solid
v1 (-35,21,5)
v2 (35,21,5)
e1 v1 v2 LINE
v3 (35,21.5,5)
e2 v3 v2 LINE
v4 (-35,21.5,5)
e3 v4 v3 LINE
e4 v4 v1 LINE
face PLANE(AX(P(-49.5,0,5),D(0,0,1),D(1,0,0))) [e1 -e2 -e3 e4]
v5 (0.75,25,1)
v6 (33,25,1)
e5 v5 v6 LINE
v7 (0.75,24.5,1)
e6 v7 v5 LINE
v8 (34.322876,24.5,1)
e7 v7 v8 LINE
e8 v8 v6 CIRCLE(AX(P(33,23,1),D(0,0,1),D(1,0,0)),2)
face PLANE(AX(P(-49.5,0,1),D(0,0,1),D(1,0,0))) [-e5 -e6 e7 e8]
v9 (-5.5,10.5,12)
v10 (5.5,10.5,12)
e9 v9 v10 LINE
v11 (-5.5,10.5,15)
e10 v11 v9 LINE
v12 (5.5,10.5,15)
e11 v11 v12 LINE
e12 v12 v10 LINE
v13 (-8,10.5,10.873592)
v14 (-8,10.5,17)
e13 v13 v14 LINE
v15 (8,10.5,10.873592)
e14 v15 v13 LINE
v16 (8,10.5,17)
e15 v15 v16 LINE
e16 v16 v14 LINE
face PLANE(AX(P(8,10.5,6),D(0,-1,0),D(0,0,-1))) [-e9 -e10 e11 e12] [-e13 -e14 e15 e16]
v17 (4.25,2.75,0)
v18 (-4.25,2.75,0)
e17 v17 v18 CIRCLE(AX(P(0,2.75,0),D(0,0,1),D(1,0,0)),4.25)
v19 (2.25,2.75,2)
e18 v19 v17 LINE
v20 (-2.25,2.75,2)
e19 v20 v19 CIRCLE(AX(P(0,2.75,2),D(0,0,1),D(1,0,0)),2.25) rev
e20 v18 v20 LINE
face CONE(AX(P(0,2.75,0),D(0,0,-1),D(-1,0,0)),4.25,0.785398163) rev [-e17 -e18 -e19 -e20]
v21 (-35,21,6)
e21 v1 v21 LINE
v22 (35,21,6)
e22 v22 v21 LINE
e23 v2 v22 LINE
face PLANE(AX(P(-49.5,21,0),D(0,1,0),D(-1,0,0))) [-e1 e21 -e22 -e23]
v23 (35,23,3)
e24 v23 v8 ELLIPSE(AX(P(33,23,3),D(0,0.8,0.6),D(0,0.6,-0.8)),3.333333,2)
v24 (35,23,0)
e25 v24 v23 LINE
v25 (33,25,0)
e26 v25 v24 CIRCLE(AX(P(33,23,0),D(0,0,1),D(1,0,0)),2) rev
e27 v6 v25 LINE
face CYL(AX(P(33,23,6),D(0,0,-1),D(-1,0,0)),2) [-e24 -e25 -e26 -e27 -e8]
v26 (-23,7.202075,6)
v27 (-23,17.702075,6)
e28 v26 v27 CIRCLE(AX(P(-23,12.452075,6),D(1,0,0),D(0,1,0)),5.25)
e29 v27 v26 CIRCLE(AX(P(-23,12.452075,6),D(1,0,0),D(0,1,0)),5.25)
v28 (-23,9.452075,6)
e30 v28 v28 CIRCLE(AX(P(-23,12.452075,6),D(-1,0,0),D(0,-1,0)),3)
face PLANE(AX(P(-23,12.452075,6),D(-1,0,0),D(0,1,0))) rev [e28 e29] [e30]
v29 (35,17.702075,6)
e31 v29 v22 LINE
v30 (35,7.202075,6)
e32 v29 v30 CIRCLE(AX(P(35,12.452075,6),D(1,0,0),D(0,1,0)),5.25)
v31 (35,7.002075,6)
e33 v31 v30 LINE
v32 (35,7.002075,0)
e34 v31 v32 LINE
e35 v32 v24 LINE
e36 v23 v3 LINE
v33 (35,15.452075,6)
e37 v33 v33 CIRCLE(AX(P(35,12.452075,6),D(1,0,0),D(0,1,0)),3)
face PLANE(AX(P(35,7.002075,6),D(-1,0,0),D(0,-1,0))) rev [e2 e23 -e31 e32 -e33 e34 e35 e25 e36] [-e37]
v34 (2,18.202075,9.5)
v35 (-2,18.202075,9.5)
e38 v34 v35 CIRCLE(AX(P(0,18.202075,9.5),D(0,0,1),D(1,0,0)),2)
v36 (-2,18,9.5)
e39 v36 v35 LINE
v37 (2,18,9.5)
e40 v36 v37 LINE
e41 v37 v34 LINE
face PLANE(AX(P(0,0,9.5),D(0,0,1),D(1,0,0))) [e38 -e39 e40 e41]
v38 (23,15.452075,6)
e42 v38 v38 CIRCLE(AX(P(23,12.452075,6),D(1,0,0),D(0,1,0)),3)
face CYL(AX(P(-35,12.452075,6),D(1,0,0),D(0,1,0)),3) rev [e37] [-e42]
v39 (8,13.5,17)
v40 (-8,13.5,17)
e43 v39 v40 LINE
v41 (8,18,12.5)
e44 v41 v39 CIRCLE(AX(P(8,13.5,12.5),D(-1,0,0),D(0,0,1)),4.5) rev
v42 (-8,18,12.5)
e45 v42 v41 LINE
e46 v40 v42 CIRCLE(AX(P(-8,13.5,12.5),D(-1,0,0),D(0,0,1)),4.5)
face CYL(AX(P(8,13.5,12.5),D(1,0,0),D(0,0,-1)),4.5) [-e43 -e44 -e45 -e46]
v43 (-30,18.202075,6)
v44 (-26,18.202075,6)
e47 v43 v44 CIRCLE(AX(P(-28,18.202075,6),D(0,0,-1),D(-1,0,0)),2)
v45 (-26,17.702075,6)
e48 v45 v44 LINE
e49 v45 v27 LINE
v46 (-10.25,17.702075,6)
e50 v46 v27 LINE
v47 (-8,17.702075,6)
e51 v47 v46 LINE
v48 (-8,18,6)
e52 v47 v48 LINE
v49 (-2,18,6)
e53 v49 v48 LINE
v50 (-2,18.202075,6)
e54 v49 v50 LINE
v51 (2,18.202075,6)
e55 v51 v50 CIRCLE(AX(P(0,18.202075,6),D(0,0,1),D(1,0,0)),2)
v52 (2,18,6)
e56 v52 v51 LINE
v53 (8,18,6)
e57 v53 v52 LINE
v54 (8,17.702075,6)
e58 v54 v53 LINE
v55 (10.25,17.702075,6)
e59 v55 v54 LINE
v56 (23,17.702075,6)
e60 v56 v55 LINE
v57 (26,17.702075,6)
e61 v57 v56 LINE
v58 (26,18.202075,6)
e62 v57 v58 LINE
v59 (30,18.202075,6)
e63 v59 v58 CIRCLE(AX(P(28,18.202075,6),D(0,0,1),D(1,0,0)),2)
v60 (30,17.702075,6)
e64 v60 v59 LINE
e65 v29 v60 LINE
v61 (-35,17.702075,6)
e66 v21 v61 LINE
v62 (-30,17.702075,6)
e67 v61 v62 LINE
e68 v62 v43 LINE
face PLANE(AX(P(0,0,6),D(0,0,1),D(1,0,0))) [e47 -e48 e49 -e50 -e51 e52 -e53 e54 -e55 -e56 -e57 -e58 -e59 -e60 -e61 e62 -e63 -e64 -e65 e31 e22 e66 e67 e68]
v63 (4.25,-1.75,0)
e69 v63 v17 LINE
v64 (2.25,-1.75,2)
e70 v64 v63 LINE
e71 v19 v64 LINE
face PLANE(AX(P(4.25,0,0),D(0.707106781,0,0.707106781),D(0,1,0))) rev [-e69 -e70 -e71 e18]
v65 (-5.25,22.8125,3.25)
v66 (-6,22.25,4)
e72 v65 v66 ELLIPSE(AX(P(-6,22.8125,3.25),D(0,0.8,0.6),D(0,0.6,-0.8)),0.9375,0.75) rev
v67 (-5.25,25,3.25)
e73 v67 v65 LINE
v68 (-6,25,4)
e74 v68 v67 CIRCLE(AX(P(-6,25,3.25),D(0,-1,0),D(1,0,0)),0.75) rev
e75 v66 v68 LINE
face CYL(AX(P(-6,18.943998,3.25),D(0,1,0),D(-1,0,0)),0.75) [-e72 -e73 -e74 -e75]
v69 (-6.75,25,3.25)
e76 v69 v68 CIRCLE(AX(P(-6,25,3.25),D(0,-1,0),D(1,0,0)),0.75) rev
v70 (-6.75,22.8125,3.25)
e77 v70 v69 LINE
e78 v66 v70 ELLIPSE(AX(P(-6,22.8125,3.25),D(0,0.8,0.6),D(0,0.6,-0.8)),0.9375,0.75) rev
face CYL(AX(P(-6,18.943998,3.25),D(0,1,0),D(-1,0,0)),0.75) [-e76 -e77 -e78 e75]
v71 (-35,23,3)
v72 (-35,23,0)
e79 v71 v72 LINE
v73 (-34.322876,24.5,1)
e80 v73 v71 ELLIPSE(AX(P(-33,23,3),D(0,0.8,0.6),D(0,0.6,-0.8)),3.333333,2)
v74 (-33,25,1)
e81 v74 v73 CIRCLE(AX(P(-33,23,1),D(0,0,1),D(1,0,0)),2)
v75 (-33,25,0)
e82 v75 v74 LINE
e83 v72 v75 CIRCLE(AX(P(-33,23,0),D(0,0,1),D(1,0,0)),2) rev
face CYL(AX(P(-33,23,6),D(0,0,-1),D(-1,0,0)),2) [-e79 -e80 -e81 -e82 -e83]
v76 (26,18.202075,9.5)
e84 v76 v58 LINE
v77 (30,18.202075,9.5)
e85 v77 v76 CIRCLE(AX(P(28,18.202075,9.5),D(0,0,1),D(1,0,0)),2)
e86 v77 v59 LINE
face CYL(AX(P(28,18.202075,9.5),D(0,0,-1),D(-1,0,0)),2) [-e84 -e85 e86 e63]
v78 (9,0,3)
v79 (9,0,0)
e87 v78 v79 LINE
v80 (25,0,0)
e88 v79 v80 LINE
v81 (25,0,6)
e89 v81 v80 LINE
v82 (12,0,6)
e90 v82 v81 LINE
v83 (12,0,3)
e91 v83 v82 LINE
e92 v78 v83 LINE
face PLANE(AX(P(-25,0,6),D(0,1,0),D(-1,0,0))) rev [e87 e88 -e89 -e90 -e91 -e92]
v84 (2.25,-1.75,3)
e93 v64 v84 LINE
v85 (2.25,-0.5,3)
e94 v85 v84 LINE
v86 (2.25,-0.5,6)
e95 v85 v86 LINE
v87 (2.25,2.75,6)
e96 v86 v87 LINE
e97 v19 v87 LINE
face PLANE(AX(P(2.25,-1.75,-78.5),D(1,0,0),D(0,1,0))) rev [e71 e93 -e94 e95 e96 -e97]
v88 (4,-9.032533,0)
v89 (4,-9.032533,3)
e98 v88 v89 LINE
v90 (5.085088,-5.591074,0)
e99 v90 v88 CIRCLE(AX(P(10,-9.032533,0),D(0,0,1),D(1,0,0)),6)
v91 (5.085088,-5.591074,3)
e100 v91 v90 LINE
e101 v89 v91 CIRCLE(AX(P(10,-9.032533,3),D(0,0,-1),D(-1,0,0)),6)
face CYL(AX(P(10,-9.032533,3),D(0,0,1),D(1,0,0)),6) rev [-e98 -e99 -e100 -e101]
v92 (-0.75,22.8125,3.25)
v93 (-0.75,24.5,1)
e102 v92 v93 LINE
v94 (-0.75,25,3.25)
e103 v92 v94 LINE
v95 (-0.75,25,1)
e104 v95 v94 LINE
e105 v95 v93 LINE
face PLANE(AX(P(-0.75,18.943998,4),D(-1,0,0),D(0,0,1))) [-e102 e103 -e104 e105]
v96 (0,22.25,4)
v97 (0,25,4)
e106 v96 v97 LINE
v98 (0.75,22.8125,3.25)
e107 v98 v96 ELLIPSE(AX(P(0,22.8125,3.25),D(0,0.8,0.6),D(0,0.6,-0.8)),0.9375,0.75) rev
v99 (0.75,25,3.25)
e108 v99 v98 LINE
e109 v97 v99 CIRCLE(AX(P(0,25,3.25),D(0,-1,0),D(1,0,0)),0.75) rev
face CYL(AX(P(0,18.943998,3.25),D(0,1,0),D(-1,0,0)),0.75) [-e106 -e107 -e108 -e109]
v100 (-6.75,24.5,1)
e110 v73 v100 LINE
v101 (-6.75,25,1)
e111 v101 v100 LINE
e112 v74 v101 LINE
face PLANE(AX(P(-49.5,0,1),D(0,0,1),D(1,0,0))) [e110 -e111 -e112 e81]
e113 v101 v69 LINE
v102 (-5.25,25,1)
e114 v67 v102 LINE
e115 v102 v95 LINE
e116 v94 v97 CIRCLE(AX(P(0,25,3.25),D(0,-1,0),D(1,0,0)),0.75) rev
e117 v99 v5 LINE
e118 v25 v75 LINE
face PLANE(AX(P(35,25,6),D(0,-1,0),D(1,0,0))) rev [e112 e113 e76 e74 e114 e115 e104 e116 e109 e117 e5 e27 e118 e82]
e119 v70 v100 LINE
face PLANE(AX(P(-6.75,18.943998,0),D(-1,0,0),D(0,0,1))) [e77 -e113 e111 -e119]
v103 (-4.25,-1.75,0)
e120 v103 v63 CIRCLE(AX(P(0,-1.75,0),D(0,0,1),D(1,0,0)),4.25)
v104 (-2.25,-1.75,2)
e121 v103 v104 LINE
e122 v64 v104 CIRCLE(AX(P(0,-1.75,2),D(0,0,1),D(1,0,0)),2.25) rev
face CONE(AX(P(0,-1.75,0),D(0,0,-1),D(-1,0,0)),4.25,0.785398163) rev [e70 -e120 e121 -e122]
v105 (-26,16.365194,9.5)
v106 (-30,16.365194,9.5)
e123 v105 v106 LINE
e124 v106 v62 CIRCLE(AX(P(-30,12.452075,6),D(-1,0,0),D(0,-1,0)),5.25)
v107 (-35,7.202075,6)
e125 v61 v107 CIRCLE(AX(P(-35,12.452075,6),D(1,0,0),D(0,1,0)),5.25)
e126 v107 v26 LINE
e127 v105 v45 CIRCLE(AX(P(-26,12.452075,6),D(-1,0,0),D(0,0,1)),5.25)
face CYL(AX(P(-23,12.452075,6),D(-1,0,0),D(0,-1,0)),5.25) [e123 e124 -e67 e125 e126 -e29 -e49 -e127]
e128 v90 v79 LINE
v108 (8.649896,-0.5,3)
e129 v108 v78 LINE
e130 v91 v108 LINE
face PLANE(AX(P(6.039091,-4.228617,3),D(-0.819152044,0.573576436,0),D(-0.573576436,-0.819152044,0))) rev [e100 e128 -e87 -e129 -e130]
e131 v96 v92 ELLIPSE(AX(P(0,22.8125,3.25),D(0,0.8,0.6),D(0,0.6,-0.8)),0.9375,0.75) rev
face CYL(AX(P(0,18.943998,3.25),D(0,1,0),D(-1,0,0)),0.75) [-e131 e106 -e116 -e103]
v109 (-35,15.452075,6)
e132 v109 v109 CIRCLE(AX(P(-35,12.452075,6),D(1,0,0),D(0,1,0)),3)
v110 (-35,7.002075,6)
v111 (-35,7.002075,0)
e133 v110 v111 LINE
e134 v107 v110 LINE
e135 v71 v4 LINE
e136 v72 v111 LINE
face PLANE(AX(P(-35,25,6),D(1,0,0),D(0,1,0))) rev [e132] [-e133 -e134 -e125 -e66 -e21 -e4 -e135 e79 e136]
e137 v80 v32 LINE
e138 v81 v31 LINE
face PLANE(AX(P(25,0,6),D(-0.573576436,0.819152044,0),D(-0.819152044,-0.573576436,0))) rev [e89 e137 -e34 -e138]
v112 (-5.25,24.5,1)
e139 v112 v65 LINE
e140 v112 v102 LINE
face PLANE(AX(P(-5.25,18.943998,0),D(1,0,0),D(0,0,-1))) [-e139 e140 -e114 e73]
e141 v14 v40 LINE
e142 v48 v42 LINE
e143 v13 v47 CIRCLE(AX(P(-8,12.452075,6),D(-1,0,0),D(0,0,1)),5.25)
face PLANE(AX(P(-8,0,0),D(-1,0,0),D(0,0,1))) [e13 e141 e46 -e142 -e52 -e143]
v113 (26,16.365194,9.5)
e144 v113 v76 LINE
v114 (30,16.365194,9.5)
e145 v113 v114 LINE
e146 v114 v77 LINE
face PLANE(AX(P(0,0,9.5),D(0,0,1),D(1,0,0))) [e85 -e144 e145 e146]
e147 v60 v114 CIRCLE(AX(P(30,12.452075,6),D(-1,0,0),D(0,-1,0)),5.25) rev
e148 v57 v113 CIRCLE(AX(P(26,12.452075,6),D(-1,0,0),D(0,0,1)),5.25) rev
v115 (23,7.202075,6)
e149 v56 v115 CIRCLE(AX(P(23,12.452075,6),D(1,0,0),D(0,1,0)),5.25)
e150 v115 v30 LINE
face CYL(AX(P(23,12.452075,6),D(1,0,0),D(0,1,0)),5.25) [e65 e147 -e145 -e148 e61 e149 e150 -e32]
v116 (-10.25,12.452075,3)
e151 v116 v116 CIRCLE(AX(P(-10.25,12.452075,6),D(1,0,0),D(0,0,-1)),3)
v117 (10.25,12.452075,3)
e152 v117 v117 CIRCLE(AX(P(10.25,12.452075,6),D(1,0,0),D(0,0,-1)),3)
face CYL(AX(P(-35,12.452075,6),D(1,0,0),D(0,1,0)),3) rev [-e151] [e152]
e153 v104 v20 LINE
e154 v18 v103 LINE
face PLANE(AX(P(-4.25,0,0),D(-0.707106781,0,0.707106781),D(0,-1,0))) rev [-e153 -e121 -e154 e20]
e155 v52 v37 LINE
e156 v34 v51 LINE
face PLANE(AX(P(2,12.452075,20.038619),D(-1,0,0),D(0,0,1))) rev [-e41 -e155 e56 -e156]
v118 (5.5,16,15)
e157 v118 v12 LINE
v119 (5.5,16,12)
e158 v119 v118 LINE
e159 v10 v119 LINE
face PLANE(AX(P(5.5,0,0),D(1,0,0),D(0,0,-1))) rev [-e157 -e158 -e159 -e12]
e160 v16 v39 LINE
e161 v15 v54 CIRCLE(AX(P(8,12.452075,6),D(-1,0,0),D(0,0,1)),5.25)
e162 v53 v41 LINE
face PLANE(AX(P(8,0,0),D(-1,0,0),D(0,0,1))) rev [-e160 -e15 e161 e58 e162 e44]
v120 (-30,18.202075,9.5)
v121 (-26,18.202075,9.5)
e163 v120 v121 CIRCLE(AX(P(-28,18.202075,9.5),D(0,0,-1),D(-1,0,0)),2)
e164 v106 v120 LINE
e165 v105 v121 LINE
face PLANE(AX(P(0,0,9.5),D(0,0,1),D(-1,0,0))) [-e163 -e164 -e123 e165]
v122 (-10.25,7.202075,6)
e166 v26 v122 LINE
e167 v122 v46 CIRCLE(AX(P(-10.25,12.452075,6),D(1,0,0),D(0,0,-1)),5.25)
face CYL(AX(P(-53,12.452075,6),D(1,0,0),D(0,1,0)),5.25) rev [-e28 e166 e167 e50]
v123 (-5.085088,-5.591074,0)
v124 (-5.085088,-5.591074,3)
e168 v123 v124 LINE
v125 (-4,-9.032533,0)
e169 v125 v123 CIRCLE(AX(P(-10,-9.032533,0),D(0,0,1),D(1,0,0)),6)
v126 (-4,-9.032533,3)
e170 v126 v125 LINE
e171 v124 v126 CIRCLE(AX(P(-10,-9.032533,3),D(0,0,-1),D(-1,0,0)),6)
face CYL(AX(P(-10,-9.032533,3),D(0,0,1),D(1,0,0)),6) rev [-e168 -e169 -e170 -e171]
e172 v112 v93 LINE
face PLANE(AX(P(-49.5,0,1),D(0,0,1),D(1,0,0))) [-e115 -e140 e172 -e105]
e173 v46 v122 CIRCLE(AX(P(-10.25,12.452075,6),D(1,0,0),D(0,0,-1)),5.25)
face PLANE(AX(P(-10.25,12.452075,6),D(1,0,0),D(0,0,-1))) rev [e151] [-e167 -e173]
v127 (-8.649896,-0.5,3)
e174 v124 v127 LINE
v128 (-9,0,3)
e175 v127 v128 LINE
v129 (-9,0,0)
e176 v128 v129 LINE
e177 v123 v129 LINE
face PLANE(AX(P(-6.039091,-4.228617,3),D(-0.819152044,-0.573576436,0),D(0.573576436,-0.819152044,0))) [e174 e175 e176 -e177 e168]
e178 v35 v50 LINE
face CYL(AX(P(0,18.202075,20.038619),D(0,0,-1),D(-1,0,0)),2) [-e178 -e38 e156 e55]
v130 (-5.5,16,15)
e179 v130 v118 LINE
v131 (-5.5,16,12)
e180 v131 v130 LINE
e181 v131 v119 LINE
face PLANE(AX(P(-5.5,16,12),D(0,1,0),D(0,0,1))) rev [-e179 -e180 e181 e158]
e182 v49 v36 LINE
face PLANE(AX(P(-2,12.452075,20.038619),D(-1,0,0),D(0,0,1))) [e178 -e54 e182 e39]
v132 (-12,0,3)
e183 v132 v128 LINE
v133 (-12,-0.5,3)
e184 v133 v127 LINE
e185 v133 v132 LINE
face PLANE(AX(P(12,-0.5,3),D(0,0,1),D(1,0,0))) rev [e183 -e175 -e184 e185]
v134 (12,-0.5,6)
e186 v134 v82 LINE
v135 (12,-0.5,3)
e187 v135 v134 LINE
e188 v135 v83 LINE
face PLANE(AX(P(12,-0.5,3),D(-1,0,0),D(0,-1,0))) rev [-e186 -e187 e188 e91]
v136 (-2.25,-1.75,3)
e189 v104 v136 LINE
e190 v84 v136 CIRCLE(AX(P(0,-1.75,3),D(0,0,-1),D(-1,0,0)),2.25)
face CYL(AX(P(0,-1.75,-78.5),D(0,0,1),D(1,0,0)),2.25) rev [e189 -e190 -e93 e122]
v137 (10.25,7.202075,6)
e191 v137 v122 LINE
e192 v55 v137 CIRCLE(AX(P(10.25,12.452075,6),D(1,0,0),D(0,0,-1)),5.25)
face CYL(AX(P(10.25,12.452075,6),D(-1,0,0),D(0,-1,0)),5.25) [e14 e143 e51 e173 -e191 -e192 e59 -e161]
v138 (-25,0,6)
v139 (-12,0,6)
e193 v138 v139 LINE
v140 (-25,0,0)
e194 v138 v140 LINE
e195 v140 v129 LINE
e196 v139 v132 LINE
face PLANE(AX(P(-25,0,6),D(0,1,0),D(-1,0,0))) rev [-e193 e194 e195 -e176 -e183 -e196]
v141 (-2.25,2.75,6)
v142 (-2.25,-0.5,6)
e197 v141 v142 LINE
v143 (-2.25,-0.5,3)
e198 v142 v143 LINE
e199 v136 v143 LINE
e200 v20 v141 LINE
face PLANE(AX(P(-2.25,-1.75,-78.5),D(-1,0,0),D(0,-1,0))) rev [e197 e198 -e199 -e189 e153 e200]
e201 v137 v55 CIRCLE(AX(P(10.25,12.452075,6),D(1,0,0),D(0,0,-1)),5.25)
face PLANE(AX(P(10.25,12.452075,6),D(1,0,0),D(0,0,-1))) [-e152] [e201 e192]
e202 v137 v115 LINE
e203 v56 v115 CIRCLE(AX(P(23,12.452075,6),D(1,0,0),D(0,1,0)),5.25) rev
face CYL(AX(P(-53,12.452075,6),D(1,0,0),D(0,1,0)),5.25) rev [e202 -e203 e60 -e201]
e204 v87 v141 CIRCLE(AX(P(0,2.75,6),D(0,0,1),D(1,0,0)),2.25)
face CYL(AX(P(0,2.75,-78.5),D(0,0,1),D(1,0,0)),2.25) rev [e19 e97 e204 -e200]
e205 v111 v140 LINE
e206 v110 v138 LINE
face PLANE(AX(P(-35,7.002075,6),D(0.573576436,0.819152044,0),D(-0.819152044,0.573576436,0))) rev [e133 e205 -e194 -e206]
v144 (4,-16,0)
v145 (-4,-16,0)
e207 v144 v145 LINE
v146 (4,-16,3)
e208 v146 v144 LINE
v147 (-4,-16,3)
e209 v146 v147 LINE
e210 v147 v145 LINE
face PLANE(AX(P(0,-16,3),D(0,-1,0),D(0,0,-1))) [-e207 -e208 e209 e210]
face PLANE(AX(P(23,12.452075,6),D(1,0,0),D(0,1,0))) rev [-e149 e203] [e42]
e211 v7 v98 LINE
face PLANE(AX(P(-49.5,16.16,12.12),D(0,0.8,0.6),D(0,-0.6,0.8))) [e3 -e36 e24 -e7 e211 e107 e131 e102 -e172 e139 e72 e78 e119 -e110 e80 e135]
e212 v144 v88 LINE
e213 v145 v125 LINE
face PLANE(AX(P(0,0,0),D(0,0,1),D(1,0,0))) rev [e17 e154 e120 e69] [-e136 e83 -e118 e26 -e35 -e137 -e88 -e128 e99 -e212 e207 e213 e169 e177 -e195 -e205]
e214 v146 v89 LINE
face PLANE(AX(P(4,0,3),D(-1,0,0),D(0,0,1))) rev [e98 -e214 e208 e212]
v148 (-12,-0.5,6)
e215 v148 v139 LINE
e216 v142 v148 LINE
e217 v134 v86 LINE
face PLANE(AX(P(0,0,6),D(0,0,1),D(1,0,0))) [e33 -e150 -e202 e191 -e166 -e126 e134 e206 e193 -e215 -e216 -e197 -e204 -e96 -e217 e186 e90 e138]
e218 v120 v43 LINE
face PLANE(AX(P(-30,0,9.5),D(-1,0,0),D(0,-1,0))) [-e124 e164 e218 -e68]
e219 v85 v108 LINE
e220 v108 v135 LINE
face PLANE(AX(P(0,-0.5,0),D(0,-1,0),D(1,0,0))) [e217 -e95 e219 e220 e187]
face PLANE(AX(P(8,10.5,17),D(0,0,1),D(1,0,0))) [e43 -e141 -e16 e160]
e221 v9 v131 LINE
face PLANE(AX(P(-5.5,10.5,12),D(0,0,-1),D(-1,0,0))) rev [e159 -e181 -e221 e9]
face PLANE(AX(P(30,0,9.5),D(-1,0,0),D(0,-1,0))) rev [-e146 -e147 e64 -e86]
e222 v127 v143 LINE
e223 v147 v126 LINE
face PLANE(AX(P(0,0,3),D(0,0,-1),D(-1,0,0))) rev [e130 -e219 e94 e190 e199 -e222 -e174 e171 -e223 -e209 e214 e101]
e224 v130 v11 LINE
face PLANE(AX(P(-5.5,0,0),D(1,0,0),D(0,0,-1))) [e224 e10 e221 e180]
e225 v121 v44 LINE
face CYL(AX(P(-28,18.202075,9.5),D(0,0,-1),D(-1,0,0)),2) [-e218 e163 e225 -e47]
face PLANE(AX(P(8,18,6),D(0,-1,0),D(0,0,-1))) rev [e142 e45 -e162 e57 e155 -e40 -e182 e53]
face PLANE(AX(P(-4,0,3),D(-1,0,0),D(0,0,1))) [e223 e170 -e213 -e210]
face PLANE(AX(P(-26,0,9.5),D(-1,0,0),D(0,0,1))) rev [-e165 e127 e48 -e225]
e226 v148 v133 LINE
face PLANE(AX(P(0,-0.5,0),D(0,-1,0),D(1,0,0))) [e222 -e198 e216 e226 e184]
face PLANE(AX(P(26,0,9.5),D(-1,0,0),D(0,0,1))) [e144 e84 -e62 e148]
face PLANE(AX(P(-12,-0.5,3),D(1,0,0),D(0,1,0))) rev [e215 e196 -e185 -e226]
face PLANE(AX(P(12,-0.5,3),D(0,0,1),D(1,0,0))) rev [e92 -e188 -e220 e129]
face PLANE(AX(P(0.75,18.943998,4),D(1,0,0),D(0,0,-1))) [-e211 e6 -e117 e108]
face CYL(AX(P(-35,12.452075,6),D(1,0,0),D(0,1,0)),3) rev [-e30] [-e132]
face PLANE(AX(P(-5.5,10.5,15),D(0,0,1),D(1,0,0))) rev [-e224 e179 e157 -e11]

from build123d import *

# Parameters (mm, degrees)
BOSS_EXTRUDE1_DEPTH = 6
SKETCH2_R           = 5.25
CUT_EXTRUDE1_DEPTH  = 88
SKETCH2_2_R         = 5.25
BOSS_EXTRUDE2_DEPTH = 12
BOSS_EXTRUDE3_START = -24.75
SKETCH2_3_R         = 5.25
BOSS_EXTRUDE3_DEPTH = 10.25
SKETCH3_W           = 4
SKETCH3_H           = 8.859259966
BOSS_EXTRUDE4_DEPTH = 3
BOSS_EXTRUDE5_DEPTH = 3.5
CUT_EXTRUDE2_DEPTH  = 84.5
SKETCH14_W          = 24
SKETCH14_H          = 3
BOSS_EXTRUDE9_DEPTH = 0.5
BOSS_EXTRUDE7_DEPTH = 3.5
SKETCH12_W          = 11
SKETCH12_H          = 7.5
BOSS_EXTRUDE8_DEPTH = 8
SKETCH13_W          = 3
SKETCH13_H          = 5.5
CUT_EXTRUDE5_DEPTH  = 5.5
FILLET6_R           = 4.5
HOLE1_START         = -35
HOLE1_OUTLINE_R     = 3
HOLE1_DEPTH         = 70
CUT_EXTRUDE3_DEPTH  = 84.5
CHAMFER1_SIZE       = 2
FILLET3_R           = 2
BOSS_EXTRUDE6_REACH = 58.524
SKETCH9_W           = 1.5
SKETCH9_H           = 4
FILLET4_R           = 0.75
FILLET5_R           = 6


# Read off the part's stored shape, not the designer's step: Hole1
with BuildPart() as part:
    # Sketch1 → Boss-Extrude1 (new body)
    with BuildSketch(Plane.XY):
        Polygon((-25, 0), (25, 0), (35, 7.002075382), (35, 25), (-35, 25), (-35, 7.002075382), align=None)
    extrude(amount=BOSS_EXTRUDE1_DEPTH)

    # Sketch2 → Cut-Extrude1 (cut)
    with BuildSketch(Plane(origin=(35, 0, 0), x_dir=(0, 0, -1), z_dir=(1, 0, 0))):
        with Locations((-6, 12.452075382)):
            Circle(SKETCH2_R)
    extrude(amount=-CUT_EXTRUDE1_DEPTH, mode=Mode.SUBTRACT)

    # Sketch2<2> → Boss-Extrude2 (add)
    with BuildSketch(Plane(origin=(35, 0, 0), x_dir=(0, 0, -1), z_dir=(1, 0, 0))):
        with Locations((-6, 12.452075382)):
            Circle(SKETCH2_2_R)
    boss_extrude2 = extrude(amount=-BOSS_EXTRUDE2_DEPTH)

    # Sketch2<3> → Boss-Extrude3 (add)
    with BuildSketch(Plane(origin=(35, 0, 0), x_dir=(0, 0, -1), z_dir=(1, 0, 0)).offset(BOSS_EXTRUDE3_START)):
        with Locations((-6, 12.452075382)):
            Circle(SKETCH2_3_R)
    boss_extrude3 = extrude(amount=-BOSS_EXTRUDE3_DEPTH)

    # Sketch3 → Boss-Extrude4 (add)
    with BuildSketch(Plane(origin=(0, 0, 0), x_dir=(-1, 0, 0), z_dir=(0, 0, -1))):
        with Locations((2, -11.570370017)):
            Rectangle(SKETCH3_W, SKETCH3_H)
        Polygon((0, -7.140740034), (4, -7.140740034), (9, 0), (0, 0), align=None)
    boss_extrude4 = extrude(amount=-BOSS_EXTRUDE4_DEPTH)

    # Sketch4 → Boss-Extrude5 (add)
    with BuildSketch(Plane.XY.offset(6)):
        with BuildLine():
            Line((26, 10.749226565), (26, 18.202075382))
            ThreePointArc((26, 18.202075382), (28, 20.202075382), (30, 18.202075382))
            Line((30, 18.202075382), (30, 10.749226565))
            ThreePointArc((30, 10.749226565), (28, 8.749226565), (26, 10.749226565))
        make_face()
    boss_extrude5 = extrude(amount=BOSS_EXTRUDE5_DEPTH)

    # Sketch5 → Cut-Extrude2 (cut)
    with BuildSketch(Plane(origin=(35, 0, 0), x_dir=(0, 0, -1), z_dir=(1, 0, 0))):
        Polygon((-1, 25), (-1, 24.5), (-5, 21.5), (-5, 21), (-6, 21), (-6, 25), align=None)
    extrude(amount=-CUT_EXTRUDE2_DEPTH, mode=Mode.SUBTRACT)

    # Mirror2: Boss-Extrude2, Boss-Extrude3, Boss-Extrude4, Boss-Extrude5 across plane
    add(boss_extrude2.mirror(Plane(origin=(0, 0, 3), x_dir=(0, 0, 1), z_dir=(-1, 0, 0))))
    add(boss_extrude3.mirror(Plane(origin=(0, 0, 3), x_dir=(0, 0, 1), z_dir=(-1, 0, 0))))
    add(boss_extrude4.mirror(Plane(origin=(0, 0, 3), x_dir=(0, 0, 1), z_dir=(-1, 0, 0))))
    add(boss_extrude5.mirror(Plane(origin=(0, 0, 3), x_dir=(0, 0, 1), z_dir=(-1, 0, 0))))

    # Sketch14 → Boss-Extrude9 (add)
    with BuildSketch(Plane.XZ):
        with Locations((0, 4.5)):
            Rectangle(SKETCH14_W, SKETCH14_H)
    extrude(amount=BOSS_EXTRUDE9_DEPTH)

    # Sketch10 → Boss-Extrude7 (add)
    with BuildSketch(Plane.XY.offset(6)):
        with BuildLine():
            Line((-2, 12.452075382), (-2, 18.202075382))
            ThreePointArc((-2, 18.202075382), (0, 20.202075382), (2, 18.202075382))
            Line((2, 18.202075382), (2, 12.452075382))
            ThreePointArc((2, 12.452075382), (0, 10.452075382), (-2, 12.452075382))
        make_face()
    extrude(amount=BOSS_EXTRUDE7_DEPTH)

    # Sketch12 → Boss-Extrude8 (add, symmetric)
    with BuildSketch(Plane(origin=(0, 0, 0), x_dir=(0, 0, -1), z_dir=(1, 0, 0))):
        with Locations((-11.5, 14.25)):
            Rectangle(SKETCH12_W, SKETCH12_H)
    extrude(amount=BOSS_EXTRUDE8_DEPTH, both=True)

    # Sketch13 → Cut-Extrude5 (cut, symmetric)
    with BuildSketch(Plane(origin=(0, 0, 0), x_dir=(0, 0, -1), z_dir=(1, 0, 0))):
        with Locations((-13.5, 13.25)):
            Rectangle(SKETCH13_W, SKETCH13_H)
    extrude(amount=CUT_EXTRUDE5_DEPTH, both=True, mode=Mode.SUBTRACT)

    # Fillet6
    fillet6_edges = [part.edges().sort_by_distance(p)[0] for p in [
        (0, 18, 17),
    ]]
    fillet(fillet6_edges, radius=FILLET6_R)

    # Hole1 outline → Hole1 (cut)
    with BuildSketch(Plane.YZ.offset(HOLE1_START)):
        with Locations((12.452075382, 6)):
            Circle(HOLE1_OUTLINE_R)
    extrude(amount=HOLE1_DEPTH, mode=Mode.SUBTRACT)

    # Sketch7 → Cut-Extrude3 (cut)
    with BuildSketch(Plane.XY.offset(6)):
        with BuildLine():
            Line((-2.25, -1.75), (-2.25, 2.75))
            ThreePointArc((-2.25, 2.75), (0, 5), (2.25, 2.75))
            Line((2.25, 2.75), (2.25, -1.75))
            ThreePointArc((2.25, -1.75), (0, -4), (-2.25, -1.75))
        make_face()
    extrude(amount=-CUT_EXTRUDE3_DEPTH, mode=Mode.SUBTRACT)

    # Chamfer1
    chamfer1_edges = [part.edges().sort_by_distance(p)[0] for p in [
        (0, 5, 0),
        (0, -4, 0),
        (-2.25, 0.5, 0),
        (2.25, 0.5, 0),
    ]]
    chamfer(chamfer1_edges, length=CHAMFER1_SIZE)

    # Fillet3
    fillet3_edges = [part.edges().sort_by_distance(p)[0] for p in [
        (-35, 25, 0.5),
        (35, 25, 0.5),
    ]]
    fillet(fillet3_edges, radius=FILLET3_R)

    # Boss-Extrude6: up to this face of the body (flat: up to its plane)
    boss_extrude6_end = Plane(part.part.faces().sort_by_distance((0, 22.996608877, 3.004521497))[0])
    # Sketch9 → Boss-Extrude6 (add, up to the picked face)
    with BuildSketch(Plane(origin=(0, 25, 0), x_dir=(1, 0, 0), z_dir=(0, 1, 0)), mode=Mode.PRIVATE) as boss_extrude6_sk1:
        with Locations((0, -2)):
            Rectangle(SKETCH9_W, SKETCH9_H)
    boss_extrude6_tool1 = split(extrude(boss_extrude6_sk1.sketch, amount=-BOSS_EXTRUDE6_REACH, mode=Mode.PRIVATE), bisect_by=boss_extrude6_end, keep=Keep.BOTH, mode=Mode.PRIVATE)
    # Sketch9 → Boss-Extrude6 (add, up to the picked face)
    with BuildSketch(Plane(origin=(0, 25, 0), x_dir=(1, 0, 0), z_dir=(0, 1, 0)), mode=Mode.PRIVATE) as boss_extrude6_sk2:
        with Locations((-6, -2)):
            Rectangle(SKETCH9_W, SKETCH9_H)
    boss_extrude6_tool2 = split(extrude(boss_extrude6_sk2.sketch, amount=-BOSS_EXTRUDE6_REACH, mode=Mode.PRIVATE), bisect_by=boss_extrude6_end, keep=Keep.BOTH, mode=Mode.PRIVATE)
    add(boss_extrude6_tool1.solids().sort_by(Axis((0, 25, 2), (0, -1, 0)))[0])
    add(boss_extrude6_tool2.solids().sort_by(Axis((-6, 25, 2), (0, -1, 0)))[0])

    # Fillet4
    fillet4_edges = [part.edges().sort_by_distance(p)[0] for p in [
        (-6.75, 23.625, 4),
        (-5.25, 23.625, 4),
        (-0.75, 23.625, 4),
        (0.75, 23.625, 4),
    ]]
    fillet(fillet4_edges, radius=FILLET4_R - 0.0001)  # a hair under: the kernel refuses the full size

    # Fillet5
    fillet5_edges = [part.edges().sort_by_distance(p)[0] for p in [
        (4, -7.140740034, 1.5),
        (-4, -7.140740034, 1.5),
    ]]
    fillet(fillet5_edges, radius=FILLET5_R)


solid = part.part
